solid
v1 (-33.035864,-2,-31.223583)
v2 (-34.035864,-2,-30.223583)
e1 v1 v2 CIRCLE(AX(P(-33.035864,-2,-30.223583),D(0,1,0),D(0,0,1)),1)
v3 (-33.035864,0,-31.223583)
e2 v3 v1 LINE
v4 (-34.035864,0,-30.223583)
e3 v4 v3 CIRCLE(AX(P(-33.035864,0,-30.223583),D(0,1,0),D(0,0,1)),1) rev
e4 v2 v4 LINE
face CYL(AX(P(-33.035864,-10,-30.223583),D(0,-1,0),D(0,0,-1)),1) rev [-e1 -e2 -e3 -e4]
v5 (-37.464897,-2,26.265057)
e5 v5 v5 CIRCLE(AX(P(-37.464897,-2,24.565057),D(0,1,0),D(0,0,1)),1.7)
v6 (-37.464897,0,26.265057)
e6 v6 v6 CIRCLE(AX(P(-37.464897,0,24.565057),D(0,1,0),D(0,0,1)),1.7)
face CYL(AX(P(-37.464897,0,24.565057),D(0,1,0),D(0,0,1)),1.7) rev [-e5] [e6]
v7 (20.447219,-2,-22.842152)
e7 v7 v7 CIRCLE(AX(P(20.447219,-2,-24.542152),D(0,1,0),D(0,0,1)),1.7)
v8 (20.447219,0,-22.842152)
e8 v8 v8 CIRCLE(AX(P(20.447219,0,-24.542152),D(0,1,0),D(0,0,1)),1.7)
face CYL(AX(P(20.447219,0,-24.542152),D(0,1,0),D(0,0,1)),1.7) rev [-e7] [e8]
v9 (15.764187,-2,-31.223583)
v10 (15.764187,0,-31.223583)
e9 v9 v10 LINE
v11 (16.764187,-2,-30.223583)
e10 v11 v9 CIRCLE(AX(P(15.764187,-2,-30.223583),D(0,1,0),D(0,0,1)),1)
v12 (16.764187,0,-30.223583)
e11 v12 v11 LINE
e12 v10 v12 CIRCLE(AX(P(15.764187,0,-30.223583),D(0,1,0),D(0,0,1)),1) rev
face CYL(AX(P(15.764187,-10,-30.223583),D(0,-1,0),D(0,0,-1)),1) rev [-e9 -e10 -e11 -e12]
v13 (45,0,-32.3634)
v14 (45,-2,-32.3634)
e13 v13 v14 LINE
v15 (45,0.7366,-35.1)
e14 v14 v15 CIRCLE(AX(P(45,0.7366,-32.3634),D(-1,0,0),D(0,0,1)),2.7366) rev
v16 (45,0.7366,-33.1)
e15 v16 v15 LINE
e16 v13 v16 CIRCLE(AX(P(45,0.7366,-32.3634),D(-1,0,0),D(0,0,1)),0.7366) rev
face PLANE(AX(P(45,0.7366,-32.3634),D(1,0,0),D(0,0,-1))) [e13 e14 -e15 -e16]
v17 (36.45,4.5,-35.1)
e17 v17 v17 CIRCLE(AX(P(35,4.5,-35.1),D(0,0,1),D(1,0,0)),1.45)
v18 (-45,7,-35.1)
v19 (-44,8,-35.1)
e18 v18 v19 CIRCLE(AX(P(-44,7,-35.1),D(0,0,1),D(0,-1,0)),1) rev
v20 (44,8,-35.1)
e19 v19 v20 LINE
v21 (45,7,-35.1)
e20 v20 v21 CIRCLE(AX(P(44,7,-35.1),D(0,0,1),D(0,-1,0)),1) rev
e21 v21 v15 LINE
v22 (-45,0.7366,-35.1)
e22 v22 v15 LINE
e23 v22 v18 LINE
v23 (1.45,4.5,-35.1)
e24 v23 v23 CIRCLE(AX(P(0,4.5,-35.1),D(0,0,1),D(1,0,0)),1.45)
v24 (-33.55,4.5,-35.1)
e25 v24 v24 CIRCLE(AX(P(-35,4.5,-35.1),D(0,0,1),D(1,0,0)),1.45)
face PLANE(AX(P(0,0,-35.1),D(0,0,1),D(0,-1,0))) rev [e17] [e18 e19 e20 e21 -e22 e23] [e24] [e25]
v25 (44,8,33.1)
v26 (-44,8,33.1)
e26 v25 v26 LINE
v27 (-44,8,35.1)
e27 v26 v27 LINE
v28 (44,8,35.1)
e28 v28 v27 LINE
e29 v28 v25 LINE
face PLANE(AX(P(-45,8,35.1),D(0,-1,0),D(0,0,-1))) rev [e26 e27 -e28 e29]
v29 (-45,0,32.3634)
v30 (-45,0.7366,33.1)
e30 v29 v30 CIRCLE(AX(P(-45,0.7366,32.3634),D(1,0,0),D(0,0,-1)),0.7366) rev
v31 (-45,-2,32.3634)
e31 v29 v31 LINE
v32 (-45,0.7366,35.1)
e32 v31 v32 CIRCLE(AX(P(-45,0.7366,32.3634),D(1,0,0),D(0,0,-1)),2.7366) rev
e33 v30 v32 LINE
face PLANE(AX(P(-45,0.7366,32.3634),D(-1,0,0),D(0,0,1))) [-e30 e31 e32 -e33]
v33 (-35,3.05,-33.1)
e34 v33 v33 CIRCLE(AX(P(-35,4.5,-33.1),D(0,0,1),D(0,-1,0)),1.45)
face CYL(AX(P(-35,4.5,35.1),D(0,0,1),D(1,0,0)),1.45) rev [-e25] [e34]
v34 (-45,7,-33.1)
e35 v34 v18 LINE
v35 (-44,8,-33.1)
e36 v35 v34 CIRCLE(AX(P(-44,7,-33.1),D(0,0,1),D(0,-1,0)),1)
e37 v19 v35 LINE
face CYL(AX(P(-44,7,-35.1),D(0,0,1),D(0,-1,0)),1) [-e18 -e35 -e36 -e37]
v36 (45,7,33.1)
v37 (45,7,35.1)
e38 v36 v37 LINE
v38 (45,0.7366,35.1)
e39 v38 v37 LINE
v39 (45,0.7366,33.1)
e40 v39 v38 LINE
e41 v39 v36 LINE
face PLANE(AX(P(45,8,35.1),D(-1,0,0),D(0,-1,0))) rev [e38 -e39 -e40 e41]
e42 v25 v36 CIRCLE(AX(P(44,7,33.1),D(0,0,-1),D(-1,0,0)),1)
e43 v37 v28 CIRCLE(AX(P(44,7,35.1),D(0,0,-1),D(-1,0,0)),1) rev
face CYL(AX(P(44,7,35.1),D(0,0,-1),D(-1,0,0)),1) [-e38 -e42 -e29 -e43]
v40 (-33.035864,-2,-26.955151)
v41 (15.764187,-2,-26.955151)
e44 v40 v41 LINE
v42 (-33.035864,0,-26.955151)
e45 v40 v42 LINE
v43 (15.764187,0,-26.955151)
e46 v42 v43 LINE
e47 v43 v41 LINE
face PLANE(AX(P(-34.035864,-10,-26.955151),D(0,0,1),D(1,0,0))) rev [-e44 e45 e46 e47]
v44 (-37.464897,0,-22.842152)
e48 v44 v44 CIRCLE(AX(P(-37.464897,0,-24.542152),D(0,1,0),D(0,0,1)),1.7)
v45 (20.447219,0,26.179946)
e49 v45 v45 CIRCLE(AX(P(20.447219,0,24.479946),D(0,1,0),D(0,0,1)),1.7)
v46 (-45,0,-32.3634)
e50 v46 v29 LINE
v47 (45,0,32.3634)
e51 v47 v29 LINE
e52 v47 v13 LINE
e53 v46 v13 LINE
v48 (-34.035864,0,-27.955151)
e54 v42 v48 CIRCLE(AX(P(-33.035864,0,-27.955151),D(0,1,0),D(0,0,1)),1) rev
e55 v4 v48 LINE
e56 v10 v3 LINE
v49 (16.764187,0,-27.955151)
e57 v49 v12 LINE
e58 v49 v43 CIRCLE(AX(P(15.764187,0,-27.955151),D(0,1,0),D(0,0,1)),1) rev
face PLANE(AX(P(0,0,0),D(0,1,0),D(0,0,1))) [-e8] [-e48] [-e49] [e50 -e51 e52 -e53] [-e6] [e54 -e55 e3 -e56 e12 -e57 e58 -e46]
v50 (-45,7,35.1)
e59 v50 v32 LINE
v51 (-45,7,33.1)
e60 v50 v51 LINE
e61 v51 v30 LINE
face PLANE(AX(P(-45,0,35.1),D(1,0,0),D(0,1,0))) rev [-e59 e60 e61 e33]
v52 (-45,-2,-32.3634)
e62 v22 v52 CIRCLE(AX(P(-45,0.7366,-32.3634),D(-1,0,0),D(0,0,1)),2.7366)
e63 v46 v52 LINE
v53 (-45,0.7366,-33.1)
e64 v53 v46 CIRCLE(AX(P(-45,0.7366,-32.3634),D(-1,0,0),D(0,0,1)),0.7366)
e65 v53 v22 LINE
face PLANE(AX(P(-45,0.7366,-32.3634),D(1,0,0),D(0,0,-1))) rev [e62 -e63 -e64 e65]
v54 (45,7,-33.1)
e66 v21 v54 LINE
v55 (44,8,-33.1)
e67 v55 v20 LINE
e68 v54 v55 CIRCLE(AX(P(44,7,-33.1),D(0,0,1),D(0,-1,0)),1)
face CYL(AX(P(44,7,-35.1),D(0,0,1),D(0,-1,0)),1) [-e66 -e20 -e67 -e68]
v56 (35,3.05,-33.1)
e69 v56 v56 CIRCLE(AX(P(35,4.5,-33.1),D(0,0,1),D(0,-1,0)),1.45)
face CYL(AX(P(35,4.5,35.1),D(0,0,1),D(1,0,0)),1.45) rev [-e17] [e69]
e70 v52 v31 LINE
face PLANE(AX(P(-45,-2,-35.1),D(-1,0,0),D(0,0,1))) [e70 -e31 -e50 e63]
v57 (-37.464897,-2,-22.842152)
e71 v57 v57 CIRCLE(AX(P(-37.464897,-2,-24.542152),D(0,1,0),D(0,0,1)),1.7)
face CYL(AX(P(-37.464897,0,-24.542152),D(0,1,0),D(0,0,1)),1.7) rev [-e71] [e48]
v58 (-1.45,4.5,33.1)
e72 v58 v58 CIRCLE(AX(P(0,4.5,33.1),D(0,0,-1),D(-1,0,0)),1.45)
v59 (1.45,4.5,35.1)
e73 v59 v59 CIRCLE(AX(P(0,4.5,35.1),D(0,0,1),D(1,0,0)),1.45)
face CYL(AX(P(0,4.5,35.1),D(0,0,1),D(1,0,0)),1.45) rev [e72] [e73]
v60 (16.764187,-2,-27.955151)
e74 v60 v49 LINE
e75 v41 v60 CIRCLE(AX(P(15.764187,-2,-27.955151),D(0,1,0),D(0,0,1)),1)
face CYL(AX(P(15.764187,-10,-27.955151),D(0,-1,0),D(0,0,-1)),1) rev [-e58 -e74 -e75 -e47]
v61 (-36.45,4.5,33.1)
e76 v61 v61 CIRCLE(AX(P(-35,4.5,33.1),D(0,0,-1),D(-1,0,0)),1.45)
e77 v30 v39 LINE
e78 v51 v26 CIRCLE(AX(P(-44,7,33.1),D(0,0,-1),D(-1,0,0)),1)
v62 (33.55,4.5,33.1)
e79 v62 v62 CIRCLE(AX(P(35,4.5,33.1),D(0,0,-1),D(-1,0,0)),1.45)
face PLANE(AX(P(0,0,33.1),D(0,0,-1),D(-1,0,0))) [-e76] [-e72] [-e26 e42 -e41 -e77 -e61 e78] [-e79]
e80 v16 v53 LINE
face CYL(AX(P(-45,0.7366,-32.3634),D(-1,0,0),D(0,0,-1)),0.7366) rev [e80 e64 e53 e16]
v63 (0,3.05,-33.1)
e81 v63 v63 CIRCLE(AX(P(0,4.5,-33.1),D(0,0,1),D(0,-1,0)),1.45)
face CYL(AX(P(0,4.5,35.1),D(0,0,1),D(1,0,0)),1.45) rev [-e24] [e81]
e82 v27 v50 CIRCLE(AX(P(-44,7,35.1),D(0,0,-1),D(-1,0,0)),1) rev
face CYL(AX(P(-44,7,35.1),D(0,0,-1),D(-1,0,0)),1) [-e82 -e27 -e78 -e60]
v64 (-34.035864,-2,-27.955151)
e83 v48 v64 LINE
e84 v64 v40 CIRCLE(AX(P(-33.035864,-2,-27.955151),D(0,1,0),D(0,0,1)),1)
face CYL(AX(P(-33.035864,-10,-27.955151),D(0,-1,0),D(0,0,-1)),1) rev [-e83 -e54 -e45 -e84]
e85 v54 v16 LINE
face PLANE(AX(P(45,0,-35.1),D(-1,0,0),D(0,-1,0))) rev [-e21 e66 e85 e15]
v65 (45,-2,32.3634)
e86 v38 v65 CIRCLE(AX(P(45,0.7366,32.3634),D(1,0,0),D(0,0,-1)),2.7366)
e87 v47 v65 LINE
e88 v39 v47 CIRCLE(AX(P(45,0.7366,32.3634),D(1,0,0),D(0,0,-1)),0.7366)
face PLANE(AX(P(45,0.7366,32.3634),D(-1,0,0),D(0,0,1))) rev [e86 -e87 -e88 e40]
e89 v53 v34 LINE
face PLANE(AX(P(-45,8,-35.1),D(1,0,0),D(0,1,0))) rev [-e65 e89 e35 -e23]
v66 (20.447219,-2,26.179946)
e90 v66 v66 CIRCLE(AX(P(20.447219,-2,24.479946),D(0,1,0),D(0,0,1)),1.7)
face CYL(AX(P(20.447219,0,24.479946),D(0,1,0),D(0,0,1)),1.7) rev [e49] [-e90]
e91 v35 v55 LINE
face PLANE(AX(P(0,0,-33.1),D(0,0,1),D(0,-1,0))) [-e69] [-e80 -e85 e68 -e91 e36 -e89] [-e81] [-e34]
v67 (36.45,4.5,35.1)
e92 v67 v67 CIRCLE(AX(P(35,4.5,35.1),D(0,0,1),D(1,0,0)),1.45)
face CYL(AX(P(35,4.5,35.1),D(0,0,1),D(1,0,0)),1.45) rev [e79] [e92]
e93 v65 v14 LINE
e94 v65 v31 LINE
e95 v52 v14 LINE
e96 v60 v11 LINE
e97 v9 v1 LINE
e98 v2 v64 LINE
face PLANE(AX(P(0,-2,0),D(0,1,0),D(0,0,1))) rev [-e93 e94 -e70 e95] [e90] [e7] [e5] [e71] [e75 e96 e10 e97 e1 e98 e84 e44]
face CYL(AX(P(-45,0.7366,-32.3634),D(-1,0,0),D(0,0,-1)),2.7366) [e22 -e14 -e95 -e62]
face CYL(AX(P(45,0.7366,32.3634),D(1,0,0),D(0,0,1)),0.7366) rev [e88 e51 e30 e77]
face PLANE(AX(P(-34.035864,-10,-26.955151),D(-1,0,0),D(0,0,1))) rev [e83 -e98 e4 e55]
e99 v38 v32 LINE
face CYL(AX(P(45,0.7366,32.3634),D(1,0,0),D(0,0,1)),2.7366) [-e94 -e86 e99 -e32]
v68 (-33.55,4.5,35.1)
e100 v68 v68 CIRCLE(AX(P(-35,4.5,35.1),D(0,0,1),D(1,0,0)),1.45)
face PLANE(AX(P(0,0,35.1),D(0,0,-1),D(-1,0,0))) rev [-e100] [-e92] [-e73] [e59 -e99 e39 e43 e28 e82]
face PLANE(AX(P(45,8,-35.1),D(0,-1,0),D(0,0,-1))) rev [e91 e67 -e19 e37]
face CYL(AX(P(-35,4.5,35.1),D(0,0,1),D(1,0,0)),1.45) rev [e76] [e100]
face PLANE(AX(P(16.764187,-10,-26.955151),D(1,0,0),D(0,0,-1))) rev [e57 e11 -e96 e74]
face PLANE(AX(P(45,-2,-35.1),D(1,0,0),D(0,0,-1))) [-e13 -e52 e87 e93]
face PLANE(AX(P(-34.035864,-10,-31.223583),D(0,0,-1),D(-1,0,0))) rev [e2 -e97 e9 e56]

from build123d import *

# Parameters (mm, degrees)
SKETCH_1_W                         = 90
SKETCH_1_H                         = 70.2
SM_BASE_FLANGE_1_DEPTH             = 2
SM_EDGE_FLANGE_1_STRIP_W           = 9.4732
SM_EDGE_FLANGE_1_STRIP_H           = 2
SM_EDGE_FLANGE_1_STRIP_CUT_DEPTH   = 90
SM_EDGE_FLANGE_1_STRIP_2_W         = 9.4732
SM_EDGE_FLANGE_1_STRIP_2_H         = 2
SM_EDGE_FLANGE_1_STRIP_CUT_2_DEPTH = 90
SM_EDGE_FLANGE_1_DEPTH             = 90
SM_EDGE_FLANGE_1_BEND_DEPTH        = 90
SKETCH_12_W                        = 50.800050643
SKETCH_12_H                        = 4.268431417
CUT_EXTRUDE_1_DEPTH                = 10
FILLET_1_R                         = 1
FILLET_2_R                         = 1
HOLE_WIZARD_M2_5_2_D               = 2.9
HOLE_WIZARD_M3_1_D                 = 3.4


# Sheet-metal steps are written as plain solids
with BuildPart() as part:
    # Sketch 1 → 基体-法兰1 (new body)
    with BuildSketch(Plane(origin=(0, 0, 0), x_dir=(1, 0, 0), z_dir=(0, 1, 0))):
        Rectangle(SKETCH_1_W, SKETCH_1_H)
    extrude(amount=-SM_BASE_FLANGE_1_DEPTH)

    # 边线-法兰1 strip (across the edge) → 边线-法兰1 strip cut (cut)
    with BuildSketch(Plane(origin=(-45, 0, 35.1), x_dir=(0, 0, -1), z_dir=(1, 0, 0))):
        with Locations((-2, -1)):
            Rectangle(SM_EDGE_FLANGE_1_STRIP_W, SM_EDGE_FLANGE_1_STRIP_H)
    extrude(amount=SM_EDGE_FLANGE_1_STRIP_CUT_DEPTH, mode=Mode.SUBTRACT)

    # 边线-法兰1 strip 2 (across the edge) → 边线-法兰1 strip cut 2 (cut)
    with BuildSketch(Plane(origin=(45, 0, -35.1), x_dir=(0, 0, 1), z_dir=(-1, 0, 0))):
        with Locations((-2, -1)):
            Rectangle(SM_EDGE_FLANGE_1_STRIP_2_W, SM_EDGE_FLANGE_1_STRIP_2_H)
    extrude(amount=SM_EDGE_FLANGE_1_STRIP_CUT_2_DEPTH, mode=Mode.SUBTRACT)

    # 边线-法兰1 section (across the edge) → 边线-法兰1 (add)
    with BuildSketch(Plane(origin=(-45, 0, 35.1), x_dir=(0, 0, -1), z_dir=(1, 0, 0))):
        with BuildLine():
            Line((0, 0.7366), (0, 8))
            Line((0, 8), (2, 8))
            Line((2, 8), (2, 0.7366))
            ThreePointArc((2, 0.7366), (2.215745145, 0.215745145), (2.7366, 0))
            Line((2.7366, 0), (2.7366, -2))
            ThreePointArc((2.7366, -2), (0.801531583, -1.198468417), (0, 0.7366))
        make_face()
    extrude(amount=SM_EDGE_FLANGE_1_DEPTH)

    # 边线-法兰1 section 2 (across the edge) → 边线-法兰1 bend (add)
    with BuildSketch(Plane(origin=(45, 0, -35.1), x_dir=(0, 0, 1), z_dir=(-1, 0, 0))):
        with BuildLine():
            Line((0, 0.7366), (0, 8))
            Line((0, 8), (2, 8))
            Line((2, 8), (2, 0.7366))
            ThreePointArc((2, 0.7366), (2.215745145, 0.215745145), (2.7366, 0))
            Line((2.7366, 0), (2.7366, -2))
            ThreePointArc((2.7366, -2), (0.801531583, -1.198468417), (0, 0.7366))
        make_face()
    extrude(amount=SM_EDGE_FLANGE_1_BEND_DEPTH)

    # 草图12 → 切除-拉伸1 (cut)
    with BuildSketch(Plane(origin=(0, 0, 0), x_dir=(1, 0, 0), z_dir=(0, 1, 0))):
        with Locations((-8.635838808, 29.089367058)):
            Rectangle(SKETCH_12_W, SKETCH_12_H)
    extrude(amount=-CUT_EXTRUDE_1_DEPTH, mode=Mode.SUBTRACT)

    # 圆角1
    fillet_1_edges = [part.edges().sort_by_distance(p)[0] for p in [
        (-34.035864129, -1, -26.955151349),
        (-34.035864129, -1, -31.223582766),
        (16.764186514, -1, -31.223582766),
        (16.764186514, -1, -26.955151349),
    ]]
    fillet(fillet_1_edges, radius=FILLET_1_R)

    # 圆角2
    fillet_2_edges = [part.edges().sort_by_distance(p)[0] for p in [
        (-45, 8, 34.1),
        (45, 8, 34.1),
        (45, 8, -34.1),
        (-45, 8, -34.1),
    ]]
    fillet(fillet_2_edges, radius=FILLET_2_R)

    # M2.5 间隙孔2 (through all)
    with Locations(Plane.XY.offset(35.1)):
        with Locations((0, 4.5), (35, 4.5), (-35, 4.5)):
            Hole(HOLE_WIZARD_M2_5_2_D / 2)

    # M3 间隙孔1 (through all)
    with Locations(Plane(origin=(0, 0, 0), x_dir=(1, 0, 0), z_dir=(0, 1, 0))):
        with Locations((-37.464896876, -24.56505715), (-37.464896876, 24.542151638), (20.447218948, 24.542151638), (20.447218948, -24.479946406)):
            Hole(HOLE_WIZARD_M3_1_D / 2)


solid = part.part
